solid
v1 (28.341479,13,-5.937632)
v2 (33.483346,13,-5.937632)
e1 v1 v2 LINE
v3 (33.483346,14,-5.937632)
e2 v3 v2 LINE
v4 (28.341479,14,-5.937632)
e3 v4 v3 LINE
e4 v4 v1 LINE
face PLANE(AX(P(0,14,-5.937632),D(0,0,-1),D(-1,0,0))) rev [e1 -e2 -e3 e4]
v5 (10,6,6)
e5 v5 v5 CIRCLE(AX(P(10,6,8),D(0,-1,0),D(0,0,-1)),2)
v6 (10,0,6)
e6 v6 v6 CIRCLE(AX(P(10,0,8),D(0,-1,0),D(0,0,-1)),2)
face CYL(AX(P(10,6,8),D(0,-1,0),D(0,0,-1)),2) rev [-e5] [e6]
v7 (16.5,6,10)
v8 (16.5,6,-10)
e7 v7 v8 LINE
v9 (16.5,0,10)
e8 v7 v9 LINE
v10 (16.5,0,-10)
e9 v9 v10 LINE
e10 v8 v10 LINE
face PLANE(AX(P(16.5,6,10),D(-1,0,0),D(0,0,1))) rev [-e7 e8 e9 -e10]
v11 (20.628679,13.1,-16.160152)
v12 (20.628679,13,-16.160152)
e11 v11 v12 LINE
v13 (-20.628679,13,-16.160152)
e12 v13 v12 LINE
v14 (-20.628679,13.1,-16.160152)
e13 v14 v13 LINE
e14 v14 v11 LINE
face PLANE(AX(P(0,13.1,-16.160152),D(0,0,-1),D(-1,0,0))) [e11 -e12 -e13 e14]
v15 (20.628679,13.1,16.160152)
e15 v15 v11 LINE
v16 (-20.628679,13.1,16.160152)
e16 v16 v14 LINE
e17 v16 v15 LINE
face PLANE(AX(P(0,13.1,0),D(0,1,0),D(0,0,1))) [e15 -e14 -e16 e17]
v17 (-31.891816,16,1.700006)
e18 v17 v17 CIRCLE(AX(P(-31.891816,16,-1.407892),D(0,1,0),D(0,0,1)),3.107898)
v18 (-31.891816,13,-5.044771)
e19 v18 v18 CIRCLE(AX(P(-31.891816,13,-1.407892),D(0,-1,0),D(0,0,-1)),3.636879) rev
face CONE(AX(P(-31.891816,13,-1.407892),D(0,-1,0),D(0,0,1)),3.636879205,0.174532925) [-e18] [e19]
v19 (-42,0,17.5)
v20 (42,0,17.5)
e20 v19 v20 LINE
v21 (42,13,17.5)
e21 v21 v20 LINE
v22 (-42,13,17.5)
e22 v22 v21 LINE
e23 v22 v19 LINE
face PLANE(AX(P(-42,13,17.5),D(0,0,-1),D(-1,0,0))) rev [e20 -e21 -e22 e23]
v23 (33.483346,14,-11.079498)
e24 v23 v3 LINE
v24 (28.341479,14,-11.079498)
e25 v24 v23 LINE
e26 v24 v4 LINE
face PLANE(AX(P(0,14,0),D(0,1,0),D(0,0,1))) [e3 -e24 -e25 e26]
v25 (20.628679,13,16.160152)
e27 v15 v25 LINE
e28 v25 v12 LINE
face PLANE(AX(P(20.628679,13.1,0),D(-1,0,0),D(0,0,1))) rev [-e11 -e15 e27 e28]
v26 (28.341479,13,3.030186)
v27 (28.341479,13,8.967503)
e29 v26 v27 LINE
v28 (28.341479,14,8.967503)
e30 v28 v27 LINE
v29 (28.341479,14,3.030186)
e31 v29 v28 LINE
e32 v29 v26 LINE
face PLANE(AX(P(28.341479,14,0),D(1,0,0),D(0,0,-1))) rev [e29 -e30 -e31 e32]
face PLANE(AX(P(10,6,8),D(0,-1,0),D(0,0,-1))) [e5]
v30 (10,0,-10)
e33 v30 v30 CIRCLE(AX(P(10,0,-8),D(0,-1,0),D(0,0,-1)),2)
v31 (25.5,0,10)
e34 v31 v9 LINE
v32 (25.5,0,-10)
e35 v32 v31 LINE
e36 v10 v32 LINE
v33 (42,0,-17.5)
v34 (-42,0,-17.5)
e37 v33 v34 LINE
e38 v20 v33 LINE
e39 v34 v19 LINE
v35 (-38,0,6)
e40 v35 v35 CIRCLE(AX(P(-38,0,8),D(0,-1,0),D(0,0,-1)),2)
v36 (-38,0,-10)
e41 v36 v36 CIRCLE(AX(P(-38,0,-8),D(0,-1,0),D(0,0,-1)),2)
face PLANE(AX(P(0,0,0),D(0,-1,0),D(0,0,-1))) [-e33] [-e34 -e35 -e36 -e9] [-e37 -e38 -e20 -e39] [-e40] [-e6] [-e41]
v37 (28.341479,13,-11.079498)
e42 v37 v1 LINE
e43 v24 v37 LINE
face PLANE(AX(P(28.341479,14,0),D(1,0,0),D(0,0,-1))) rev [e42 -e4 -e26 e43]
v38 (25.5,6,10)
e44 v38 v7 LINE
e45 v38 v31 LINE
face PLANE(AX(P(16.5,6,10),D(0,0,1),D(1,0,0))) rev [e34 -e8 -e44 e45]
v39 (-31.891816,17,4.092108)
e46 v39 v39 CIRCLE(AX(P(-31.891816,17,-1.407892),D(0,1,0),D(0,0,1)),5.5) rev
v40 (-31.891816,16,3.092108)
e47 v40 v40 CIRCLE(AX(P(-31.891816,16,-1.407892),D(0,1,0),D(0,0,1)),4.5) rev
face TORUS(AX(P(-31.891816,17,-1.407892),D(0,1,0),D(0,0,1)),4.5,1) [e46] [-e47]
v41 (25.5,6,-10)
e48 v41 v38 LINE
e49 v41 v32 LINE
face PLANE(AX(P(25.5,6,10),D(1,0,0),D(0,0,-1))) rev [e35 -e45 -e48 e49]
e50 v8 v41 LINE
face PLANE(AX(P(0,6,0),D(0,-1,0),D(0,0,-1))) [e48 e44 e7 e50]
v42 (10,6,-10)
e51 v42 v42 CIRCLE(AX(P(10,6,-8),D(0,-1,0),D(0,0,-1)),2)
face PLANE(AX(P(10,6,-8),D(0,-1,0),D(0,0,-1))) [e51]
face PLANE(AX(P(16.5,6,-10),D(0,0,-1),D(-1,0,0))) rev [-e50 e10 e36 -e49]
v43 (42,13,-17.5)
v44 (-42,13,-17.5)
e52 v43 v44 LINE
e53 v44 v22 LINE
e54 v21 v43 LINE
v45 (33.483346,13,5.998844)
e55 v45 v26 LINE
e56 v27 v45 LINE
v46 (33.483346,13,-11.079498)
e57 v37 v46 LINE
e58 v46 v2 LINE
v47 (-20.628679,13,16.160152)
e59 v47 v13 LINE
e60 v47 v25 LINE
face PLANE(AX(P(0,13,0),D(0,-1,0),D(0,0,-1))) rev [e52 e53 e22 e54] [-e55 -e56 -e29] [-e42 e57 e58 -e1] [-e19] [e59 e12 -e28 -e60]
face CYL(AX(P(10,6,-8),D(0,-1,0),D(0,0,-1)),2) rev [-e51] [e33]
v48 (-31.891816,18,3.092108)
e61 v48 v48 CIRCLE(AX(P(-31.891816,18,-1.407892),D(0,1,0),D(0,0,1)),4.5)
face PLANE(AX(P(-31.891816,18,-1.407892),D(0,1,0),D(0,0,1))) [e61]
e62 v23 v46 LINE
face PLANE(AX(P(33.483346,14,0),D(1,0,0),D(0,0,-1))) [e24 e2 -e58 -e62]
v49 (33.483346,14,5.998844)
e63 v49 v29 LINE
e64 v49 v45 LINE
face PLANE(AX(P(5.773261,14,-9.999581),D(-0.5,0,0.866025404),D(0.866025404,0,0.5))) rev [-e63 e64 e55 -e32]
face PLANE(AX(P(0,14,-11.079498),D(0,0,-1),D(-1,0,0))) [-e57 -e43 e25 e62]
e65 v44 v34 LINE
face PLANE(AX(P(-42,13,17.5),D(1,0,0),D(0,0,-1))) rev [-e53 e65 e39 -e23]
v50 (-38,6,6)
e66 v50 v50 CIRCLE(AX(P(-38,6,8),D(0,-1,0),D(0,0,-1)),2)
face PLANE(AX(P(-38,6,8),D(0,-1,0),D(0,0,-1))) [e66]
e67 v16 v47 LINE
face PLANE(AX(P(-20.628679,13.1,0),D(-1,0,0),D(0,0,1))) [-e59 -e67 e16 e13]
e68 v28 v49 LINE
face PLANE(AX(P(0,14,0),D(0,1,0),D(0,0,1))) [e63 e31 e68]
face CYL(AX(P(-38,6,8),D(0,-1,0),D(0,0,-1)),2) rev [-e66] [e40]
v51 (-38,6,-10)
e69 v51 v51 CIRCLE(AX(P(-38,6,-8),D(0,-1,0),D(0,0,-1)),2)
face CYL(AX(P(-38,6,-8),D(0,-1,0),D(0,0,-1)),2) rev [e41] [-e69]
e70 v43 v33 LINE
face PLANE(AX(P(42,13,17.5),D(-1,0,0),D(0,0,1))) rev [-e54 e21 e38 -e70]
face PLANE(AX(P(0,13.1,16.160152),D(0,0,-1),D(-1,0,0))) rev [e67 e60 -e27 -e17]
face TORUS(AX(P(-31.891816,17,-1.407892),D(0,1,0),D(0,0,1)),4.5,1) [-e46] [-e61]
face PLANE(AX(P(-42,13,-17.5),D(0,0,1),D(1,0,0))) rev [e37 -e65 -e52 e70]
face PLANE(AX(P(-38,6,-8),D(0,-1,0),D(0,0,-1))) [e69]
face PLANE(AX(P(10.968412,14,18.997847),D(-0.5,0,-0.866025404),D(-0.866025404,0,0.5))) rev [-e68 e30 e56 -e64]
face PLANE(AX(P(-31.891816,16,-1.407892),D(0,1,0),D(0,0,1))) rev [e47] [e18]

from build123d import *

# Parameters (mm, degrees)
SKETCH_1_W          = 84
SKETCH_1_H          = 35
EXTRUDE_1_DEPTH     = 13
SKETCH_2_R          = 3.636879205
EXTRUDE_2_DEPTH     = 3
EXTRUDE_2_TAPER     = 10
SKETCH_2_3_W        = 5.141866658
SKETCH_2_3_H        = 5.141866659
EXTRUDE_3_DEPTH     = 1
SKETCH_2_4_W        = 41.257358664
SKETCH_2_4_H        = 32.32030471
EXTRUDE_4_DEPTH     = 0.1
SKETCH_4_R          = 5.5
EXTRUDE_5_DEPTH     = 2
FILLET_1_R          = 1
SKETCH_5_R          = 2
SKETCH_5_W          = 9
SKETCH_5_H          = 20
CUT_EXTRUDE_1_DEPTH = 6


with BuildPart() as part:
    # 草图1 → 凸台-拉伸1 (new body)
    with BuildSketch(Plane(origin=(0, 0, 0), x_dir=(1, 0, 0), z_dir=(0, 1, 0))):
        Rectangle(SKETCH_1_W, SKETCH_1_H)
    extrude(amount=EXTRUDE_1_DEPTH)

    # 草图2 → 凸台-拉伸2 (add)
    with BuildSketch(Plane(origin=(0, 13, 0), x_dir=(1, 0, 0), z_dir=(0, 1, 0))):
        with Locations((-31.891815821, 1.407892061)):
            Circle(SKETCH_2_R)
    extrude(amount=EXTRUDE_2_DEPTH, taper=EXTRUDE_2_TAPER)

    # 草图2<3> → 凸台-拉伸3 (add)
    with BuildSketch(Plane(origin=(0, 13, 0), x_dir=(1, 0, 0), z_dir=(0, 1, 0))):
        with Locations((30.912412648, 8.508565066)):
            Rectangle(SKETCH_2_3_W, SKETCH_2_3_H)
        Polygon((28.341479319, -3.030186335), (28.341479319, -8.967502534), (33.483345977, -5.998844435), align=None)
    extrude(amount=EXTRUDE_3_DEPTH)

    # 草图2<4> → 凸台-拉伸4 (add)
    with BuildSketch(Plane(origin=(0, 13, 0), x_dir=(1, 0, 0), z_dir=(0, 1, 0))):
        Rectangle(SKETCH_2_4_W, SKETCH_2_4_H)
    extrude(amount=EXTRUDE_4_DEPTH)

    # 草图4 → 凸台-拉伸5 (add)
    with BuildSketch(Plane(origin=(0, 16, 0), x_dir=(1, 0, 0), z_dir=(0, 1, 0))):
        with Locations(Location((-31.891815821, 1.407892061, 0), (0, 0, 270))):
            Circle(SKETCH_4_R)
    extrude(amount=EXTRUDE_5_DEPTH)

    # 圆角1
    fillet_1_edges = [part.edges().sort_by_distance(p)[0] for p in [
        (-31.891815821, 16, -6.907892061),
        (-31.891815821, 18, -6.907892061),
    ]]
    fillet(fillet_1_edges, radius=FILLET_1_R - 0.0001)  # a hair under: the kernel refuses the full size

    # 草图5 → 切除-拉伸1 (cut)
    with BuildSketch(Plane.XZ):
        with Locations(Location((-38, 8, 0), (0, 0, 270))):
            Circle(SKETCH_5_R)
        with Locations(Location((-38, -8, 0), (0, 0, 270))):
            Circle(SKETCH_5_R)
        with Locations(Location((10, 8, 0), (0, 0, 270))):
            Circle(SKETCH_5_R)
        with Locations(Location((10, -8, 0), (0, 0, 270))):
            Circle(SKETCH_5_R)
        with Locations((21, 0)):
            Rectangle(SKETCH_5_W, SKETCH_5_H)
    extrude(amount=-CUT_EXTRUDE_1_DEPTH, mode=Mode.SUBTRACT)


solid = part.part
